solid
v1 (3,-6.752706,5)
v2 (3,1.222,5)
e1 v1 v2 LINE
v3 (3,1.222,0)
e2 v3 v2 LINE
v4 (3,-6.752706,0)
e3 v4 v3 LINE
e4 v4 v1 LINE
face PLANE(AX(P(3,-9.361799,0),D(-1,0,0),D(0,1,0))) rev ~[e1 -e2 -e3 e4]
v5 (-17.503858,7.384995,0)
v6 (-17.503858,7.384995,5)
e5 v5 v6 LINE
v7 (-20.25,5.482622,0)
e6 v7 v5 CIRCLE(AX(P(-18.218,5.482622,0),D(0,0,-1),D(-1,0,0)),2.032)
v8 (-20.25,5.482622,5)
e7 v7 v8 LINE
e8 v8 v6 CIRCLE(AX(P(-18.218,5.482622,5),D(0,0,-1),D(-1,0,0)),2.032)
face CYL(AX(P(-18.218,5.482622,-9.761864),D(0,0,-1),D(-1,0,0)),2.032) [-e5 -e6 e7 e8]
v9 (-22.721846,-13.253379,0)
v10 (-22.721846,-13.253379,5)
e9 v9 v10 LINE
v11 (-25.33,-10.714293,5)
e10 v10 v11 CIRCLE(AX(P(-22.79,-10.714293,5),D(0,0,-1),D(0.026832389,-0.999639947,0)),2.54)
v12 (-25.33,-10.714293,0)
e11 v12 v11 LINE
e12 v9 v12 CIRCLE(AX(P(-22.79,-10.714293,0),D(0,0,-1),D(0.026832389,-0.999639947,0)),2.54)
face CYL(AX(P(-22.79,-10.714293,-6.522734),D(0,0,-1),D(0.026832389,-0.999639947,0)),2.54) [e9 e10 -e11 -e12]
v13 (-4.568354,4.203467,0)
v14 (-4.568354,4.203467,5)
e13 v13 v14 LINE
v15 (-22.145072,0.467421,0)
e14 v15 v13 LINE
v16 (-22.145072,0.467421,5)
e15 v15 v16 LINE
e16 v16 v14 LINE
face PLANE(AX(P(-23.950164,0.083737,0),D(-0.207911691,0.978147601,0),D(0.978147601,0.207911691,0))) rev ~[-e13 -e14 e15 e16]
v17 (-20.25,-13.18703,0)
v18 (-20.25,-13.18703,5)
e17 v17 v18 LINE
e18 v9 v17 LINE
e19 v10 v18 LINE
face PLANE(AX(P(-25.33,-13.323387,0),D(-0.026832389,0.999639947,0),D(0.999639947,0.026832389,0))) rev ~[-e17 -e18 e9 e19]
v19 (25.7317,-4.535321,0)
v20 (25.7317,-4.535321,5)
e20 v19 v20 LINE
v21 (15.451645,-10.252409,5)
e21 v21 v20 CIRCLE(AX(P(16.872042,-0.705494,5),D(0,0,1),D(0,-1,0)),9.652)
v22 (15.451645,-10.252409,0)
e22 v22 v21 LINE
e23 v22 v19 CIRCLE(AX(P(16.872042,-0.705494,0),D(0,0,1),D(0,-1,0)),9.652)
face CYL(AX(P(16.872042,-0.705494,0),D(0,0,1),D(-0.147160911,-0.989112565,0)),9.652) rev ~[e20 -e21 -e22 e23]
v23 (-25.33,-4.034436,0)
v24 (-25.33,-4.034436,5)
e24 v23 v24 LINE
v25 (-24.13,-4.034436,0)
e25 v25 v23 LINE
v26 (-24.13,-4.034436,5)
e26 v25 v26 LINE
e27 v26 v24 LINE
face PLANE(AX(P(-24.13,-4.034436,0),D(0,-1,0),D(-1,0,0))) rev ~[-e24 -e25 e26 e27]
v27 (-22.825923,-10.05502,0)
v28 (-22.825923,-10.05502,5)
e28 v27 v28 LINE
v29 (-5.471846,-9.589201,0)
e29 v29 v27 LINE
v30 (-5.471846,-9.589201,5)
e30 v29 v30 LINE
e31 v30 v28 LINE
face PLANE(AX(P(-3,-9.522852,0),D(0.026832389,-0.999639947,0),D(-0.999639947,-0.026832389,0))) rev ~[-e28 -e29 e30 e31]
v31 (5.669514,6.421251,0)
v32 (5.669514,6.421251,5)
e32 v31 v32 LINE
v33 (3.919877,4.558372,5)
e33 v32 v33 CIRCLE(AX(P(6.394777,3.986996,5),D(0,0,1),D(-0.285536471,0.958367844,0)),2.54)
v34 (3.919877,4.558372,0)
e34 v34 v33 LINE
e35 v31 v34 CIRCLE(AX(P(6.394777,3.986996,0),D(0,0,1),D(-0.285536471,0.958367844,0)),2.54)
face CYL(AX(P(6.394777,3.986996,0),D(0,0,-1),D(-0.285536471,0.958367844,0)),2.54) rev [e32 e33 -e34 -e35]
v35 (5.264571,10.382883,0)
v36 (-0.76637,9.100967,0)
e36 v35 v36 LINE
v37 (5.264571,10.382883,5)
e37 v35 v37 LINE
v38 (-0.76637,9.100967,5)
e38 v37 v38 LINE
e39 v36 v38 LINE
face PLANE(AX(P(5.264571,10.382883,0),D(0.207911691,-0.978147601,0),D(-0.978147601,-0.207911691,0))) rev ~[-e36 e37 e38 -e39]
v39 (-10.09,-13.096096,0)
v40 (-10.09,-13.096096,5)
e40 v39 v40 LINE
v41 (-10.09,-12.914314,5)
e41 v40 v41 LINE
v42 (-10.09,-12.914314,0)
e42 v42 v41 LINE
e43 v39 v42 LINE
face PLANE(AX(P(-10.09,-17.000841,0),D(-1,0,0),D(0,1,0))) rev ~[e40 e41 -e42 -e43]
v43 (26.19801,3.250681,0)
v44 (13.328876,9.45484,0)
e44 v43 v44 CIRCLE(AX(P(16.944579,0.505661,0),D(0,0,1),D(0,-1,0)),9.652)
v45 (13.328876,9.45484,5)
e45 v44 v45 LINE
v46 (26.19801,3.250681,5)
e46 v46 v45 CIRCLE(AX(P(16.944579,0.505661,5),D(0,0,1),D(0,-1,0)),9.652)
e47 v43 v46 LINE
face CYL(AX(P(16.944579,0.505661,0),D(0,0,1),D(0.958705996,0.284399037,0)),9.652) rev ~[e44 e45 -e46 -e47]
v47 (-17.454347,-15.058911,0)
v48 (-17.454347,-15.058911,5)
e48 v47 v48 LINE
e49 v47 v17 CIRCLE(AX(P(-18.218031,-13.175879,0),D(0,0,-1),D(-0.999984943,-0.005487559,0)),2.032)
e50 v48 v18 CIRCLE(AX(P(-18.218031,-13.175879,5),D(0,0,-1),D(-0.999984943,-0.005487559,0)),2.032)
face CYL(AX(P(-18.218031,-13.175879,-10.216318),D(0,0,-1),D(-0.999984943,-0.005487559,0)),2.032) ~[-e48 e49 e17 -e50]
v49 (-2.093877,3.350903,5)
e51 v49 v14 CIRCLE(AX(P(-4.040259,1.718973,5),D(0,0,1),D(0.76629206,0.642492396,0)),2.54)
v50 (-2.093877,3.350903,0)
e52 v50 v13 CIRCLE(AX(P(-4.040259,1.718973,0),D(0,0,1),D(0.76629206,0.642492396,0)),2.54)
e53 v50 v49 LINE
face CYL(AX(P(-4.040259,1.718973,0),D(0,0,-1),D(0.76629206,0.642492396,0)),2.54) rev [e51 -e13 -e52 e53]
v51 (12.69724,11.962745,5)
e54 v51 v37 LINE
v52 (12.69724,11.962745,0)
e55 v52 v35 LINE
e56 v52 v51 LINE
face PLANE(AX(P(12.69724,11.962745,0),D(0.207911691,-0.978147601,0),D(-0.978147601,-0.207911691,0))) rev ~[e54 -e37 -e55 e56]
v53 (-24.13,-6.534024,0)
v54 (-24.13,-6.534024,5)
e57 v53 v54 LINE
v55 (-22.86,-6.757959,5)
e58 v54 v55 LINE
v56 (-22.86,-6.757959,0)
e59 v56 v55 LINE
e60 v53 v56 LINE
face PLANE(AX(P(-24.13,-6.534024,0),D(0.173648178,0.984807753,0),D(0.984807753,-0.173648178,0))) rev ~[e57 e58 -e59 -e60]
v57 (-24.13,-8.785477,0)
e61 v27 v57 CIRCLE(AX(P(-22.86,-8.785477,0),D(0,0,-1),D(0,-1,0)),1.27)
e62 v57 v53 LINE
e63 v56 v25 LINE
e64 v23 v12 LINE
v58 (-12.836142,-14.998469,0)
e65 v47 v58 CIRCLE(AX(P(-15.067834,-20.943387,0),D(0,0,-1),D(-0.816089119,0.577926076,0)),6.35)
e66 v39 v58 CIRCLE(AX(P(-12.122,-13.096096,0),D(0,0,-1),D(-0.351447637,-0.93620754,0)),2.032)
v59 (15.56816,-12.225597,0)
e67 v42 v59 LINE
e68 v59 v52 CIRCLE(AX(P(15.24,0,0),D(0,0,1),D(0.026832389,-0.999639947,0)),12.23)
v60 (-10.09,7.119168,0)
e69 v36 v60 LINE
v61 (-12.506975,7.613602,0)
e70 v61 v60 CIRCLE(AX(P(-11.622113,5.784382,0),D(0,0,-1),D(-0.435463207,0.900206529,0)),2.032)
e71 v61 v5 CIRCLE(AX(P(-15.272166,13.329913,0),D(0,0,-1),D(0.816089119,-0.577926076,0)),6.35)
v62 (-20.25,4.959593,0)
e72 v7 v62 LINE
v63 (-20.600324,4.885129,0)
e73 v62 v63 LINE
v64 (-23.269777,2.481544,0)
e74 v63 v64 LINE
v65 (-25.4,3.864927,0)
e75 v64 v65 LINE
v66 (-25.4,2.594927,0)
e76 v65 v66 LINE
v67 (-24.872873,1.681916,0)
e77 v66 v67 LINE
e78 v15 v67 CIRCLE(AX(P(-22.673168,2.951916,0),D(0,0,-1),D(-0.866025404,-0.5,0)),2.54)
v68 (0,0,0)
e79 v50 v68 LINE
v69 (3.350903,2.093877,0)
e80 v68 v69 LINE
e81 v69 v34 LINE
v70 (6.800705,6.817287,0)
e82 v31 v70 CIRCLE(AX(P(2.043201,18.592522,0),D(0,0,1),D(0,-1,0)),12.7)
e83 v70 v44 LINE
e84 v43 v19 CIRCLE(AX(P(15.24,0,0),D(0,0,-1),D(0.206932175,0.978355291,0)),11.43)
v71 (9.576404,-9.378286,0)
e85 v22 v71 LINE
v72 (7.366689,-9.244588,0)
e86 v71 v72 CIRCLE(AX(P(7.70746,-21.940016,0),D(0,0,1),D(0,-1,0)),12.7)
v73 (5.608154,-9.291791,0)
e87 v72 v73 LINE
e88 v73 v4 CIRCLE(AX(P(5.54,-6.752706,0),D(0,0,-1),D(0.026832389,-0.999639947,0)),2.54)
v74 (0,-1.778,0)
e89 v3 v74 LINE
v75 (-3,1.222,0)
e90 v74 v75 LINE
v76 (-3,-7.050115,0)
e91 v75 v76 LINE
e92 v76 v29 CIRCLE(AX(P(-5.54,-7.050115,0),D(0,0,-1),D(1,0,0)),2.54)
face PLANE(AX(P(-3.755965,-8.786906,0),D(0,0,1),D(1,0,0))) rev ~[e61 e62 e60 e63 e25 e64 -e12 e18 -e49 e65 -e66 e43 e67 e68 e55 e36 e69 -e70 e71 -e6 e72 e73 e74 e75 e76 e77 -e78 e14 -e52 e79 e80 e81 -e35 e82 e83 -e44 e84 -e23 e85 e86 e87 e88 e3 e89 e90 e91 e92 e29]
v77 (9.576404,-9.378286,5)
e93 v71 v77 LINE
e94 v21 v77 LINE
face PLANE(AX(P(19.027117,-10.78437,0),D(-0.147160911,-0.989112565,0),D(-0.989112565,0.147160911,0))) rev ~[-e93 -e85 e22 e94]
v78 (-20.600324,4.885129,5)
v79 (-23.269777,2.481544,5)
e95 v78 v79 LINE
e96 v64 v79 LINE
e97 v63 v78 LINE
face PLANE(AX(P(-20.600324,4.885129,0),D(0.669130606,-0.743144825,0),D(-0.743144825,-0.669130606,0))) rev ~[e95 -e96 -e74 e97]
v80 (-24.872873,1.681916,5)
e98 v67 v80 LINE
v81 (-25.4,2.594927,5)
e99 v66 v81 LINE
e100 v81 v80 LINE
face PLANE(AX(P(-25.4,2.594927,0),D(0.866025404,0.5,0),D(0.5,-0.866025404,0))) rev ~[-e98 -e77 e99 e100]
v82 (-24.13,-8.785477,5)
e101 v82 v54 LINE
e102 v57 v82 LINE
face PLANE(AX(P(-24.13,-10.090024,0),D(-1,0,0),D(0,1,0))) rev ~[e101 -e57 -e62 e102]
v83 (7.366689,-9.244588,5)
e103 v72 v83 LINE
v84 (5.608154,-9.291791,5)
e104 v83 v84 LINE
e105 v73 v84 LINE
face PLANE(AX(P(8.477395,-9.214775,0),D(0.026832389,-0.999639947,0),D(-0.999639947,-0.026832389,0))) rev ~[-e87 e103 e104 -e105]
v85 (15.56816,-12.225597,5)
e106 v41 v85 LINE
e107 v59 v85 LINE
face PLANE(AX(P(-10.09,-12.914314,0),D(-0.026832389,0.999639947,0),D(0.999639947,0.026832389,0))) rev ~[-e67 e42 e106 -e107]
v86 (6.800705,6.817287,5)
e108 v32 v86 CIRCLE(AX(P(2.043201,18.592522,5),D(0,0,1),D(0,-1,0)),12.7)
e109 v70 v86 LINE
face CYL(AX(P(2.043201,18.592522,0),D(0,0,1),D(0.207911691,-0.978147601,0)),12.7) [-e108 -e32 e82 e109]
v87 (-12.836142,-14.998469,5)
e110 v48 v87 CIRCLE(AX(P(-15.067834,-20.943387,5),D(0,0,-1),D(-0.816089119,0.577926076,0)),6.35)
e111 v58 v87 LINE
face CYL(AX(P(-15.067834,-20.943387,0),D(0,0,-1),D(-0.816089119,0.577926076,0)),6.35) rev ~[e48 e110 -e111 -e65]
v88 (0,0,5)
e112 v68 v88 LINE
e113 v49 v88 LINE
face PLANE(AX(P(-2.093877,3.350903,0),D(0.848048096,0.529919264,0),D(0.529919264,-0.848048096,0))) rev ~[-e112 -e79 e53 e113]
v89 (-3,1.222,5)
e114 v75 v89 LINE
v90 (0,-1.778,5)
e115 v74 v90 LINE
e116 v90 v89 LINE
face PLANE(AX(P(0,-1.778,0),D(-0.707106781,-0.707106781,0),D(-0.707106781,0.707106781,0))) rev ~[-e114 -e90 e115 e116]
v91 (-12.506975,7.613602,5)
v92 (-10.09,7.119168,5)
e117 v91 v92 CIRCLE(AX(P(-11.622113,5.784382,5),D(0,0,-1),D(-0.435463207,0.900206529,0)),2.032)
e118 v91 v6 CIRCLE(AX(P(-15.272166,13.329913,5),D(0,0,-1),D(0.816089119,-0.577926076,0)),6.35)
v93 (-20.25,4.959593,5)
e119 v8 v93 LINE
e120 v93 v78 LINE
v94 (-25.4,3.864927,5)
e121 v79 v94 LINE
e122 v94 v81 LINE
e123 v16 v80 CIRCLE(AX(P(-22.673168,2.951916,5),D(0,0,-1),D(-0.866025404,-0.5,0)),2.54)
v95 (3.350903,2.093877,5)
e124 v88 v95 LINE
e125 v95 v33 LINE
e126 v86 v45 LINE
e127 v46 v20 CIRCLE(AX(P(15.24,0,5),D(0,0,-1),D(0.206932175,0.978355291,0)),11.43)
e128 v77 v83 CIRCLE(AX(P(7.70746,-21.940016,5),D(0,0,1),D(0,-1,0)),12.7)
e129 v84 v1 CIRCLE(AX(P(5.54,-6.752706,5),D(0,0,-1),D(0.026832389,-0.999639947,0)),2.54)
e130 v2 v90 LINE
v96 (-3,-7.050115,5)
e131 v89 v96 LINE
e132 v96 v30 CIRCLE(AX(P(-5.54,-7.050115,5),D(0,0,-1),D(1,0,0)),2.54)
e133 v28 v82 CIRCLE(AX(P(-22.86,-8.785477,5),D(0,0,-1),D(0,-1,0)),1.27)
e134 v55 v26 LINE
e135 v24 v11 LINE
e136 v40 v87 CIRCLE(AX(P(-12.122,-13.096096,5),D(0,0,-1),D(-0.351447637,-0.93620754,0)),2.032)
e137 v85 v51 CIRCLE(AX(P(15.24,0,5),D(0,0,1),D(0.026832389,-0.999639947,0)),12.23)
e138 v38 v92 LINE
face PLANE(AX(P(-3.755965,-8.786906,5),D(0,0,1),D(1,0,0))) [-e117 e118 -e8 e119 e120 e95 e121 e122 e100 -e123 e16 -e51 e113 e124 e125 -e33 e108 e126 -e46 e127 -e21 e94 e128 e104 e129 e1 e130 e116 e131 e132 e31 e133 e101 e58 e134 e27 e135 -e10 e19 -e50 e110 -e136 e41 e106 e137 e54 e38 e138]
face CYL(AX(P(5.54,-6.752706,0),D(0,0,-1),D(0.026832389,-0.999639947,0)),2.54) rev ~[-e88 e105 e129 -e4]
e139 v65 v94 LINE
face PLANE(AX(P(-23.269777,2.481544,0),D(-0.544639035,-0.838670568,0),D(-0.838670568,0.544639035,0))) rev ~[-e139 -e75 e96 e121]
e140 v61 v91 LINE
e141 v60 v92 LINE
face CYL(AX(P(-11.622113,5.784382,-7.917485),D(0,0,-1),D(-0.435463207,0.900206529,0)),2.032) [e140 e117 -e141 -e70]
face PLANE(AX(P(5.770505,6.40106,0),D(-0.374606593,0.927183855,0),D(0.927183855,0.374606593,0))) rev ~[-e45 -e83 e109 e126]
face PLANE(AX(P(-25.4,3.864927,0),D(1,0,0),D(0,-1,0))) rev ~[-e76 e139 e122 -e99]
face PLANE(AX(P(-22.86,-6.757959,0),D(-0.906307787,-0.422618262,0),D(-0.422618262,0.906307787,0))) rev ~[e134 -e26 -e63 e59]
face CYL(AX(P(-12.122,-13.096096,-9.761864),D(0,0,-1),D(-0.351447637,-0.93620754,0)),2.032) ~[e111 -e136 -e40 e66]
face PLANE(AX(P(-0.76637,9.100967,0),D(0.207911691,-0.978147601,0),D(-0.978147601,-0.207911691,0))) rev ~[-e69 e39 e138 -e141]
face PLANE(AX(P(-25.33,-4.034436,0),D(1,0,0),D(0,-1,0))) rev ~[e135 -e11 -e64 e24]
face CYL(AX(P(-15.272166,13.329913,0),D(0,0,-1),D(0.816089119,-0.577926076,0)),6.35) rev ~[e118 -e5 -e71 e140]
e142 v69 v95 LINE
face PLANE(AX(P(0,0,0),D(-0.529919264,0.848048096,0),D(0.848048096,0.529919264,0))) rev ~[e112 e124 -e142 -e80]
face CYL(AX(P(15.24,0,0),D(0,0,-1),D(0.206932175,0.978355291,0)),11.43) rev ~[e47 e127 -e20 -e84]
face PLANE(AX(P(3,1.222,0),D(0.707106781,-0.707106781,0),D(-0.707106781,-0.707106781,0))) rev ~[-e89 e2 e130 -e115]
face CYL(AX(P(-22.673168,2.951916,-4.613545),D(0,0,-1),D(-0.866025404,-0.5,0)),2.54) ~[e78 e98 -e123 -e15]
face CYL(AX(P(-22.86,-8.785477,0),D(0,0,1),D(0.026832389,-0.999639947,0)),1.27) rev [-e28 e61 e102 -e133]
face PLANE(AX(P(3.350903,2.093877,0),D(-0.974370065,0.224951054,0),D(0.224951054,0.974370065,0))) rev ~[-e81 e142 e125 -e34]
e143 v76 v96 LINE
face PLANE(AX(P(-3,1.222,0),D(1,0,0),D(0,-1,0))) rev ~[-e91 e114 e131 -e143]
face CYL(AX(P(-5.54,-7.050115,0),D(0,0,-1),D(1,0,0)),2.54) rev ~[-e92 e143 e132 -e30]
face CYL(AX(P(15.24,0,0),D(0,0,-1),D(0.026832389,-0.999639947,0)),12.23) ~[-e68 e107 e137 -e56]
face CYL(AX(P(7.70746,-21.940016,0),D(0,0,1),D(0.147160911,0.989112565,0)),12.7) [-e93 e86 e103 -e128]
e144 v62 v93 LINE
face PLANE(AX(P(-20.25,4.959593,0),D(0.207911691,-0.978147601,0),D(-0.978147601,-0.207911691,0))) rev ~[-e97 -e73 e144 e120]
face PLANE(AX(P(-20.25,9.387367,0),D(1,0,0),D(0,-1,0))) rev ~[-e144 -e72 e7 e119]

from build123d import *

# Parameters (mm, degrees)
F1_DEPTH     = 5
F2_R         = 12.7
F3_T1_DEPTH  = 5
F3_T3_DEPTH  = 5
F3_T5_DEPTH  = 5
F3_T7_DEPTH  = 5
F3_T9_DEPTH  = 14.2270901057
F3_T11_DEPTH = 18.0454684025
F4_R         = 1.27
F5_R         = 9.652
F6_T1_DEPTH  = 24.5237287856
F6_T3_DEPTH  = 20.8349691576
F6_T5_DEPTH  = 25.4326352389


# Not quite as in the source:
# - a fillet or chamfer that OpenCascade refuses, or shapes differently, is made with other operations: its cross-section is extruded or revolved along the edge and cut away or added


with BuildPart() as f1:
    # F0 (on Top) → F1 (new body)
    with BuildSketch(Plane.XY):
        Polygon((3.3509032068, 2.0938767152), (4.2717468935, 6.0824889279), (5.2645709983, 10.3828825854), (-0.7663700033, 9.1009665025), (-1.7591941081, 4.800572845), (-2.0938767152, 3.3509032068), (0, 0), align=None)
        with BuildLine():
            ThreePointArc((19.0271173058, -10.7843702882), (13.5579507926, -11.3055566189), (8.4773948837, -9.2147746604))
            Line((8.4773948837, -9.2147746604), (3, -9.3617991862))
            Line((3, -9.3617991862), (-3, -9.5228515064))
            Line((-3, -9.5228515064), (-24.13, -10.0900240941))
            Line((-24.13, -10.0900240941), (-24.13, -6.5340240941))
            Line((-24.13, -6.5340240941), (-24.13, -4.0344355705))
            Line((-24.13, -4.0344355705), (-25.33, -4.0344355705))
            Line((-25.33, -4.0344355705), (-25.33, -13.3233871439))
            Line((-25.33, -13.3233871439), (-20.25, -13.1870295128))
            Line((-20.25, -13.1870295128), (-10.09, -12.9143142505))
            Line((-10.09, -12.9143142505), (15.568160115, -12.2255965474))
            ThreePointArc((15.568160115, -12.2255965474), (27.3847553183, 1.4414639293), (12.6972400213, 11.962745157))
            Line((12.6972400213, 11.962745157), (5.2645709983, 10.3828825854))
            Line((5.2645709983, 10.3828825854), (4.2717468935, 6.0824889279))
            Line((4.2717468935, 6.0824889279), (5.7705051289, 6.4010598252))
            ThreePointArc((5.7705051289, 6.4010598252), (10.9582466373, 10.5977114577), (17.6052347625, 11.1826009729))
            ThreePointArc((17.6052347625, 11.1826009729), (26.6461306142, 0.7382983213), (19.0271173058, -10.7843702882))
        make_face()
        Polygon((-24.13, -4.0344355705), (-24.13, -6.5340240941), (-22.86, -6.7579593596), align=None)
        Polygon((-3, -9.5228515064), (3, -9.3617991862), (3, 1.222), (0, -1.778), (-3, 1.222), align=None)
        Polygon((-1.7591941081, 4.800572845), (-0.7663700033, 9.1009665025), (-10.09, 7.1191677681), (-20.25, 4.9595931015), (-20.6003244103, 4.8851293494), (-23.2697767574, 2.48154366), (-25.4, 3.8649268089), (-25.4, 2.5949268089), (-23.9501636865, 0.0837366513), align=None)
        with BuildLine():
            Line((5.7705051289, 6.4010598252), (17.6052347625, 11.1826009729))
            ThreePointArc((17.6052347625, 11.1826009729), (10.9582466373, 10.5977114577), (5.7705051289, 6.4010598252))
        make_face()
        with BuildLine():
            Line((19.0271173058, -10.7843702882), (8.4773948837, -9.2147746604))
            ThreePointArc((8.4773948837, -9.2147746604), (13.5579507926, -11.3055566189), (19.0271173058, -10.7843702882))
        make_face()
        with BuildLine():
            Line((-20.25, 4.9595931015), (-10.09, 7.1191677681))
            Line((-10.09, 7.1191677681), (-10.09, 9.660082633))
            ThreePointArc((-10.09, 9.660082633), (-15.1017802383, 6.9821995552), (-20.25, 9.3873673708))
            Line((-20.25, 9.3873673708), (-20.25, 4.9595931015))
        make_face()
        with BuildLine():
            Line((-10.09, -17.0008412983), (-10.09, -12.9143142505))
            Line((-10.09, -12.9143142505), (-20.25, -13.1870295128))
            Line((-20.25, -13.1870295128), (-20.25, -17.2735565605))
            ThreePointArc((-20.25, -17.2735565605), (-15.2382197617, -14.5956734827), (-10.09, -17.0008412983))
        make_face()
    extrude(amount=F1_DEPTH)

    # F2
    f2_edges = [f1.edges().sort_by_distance(p)[0] for p in [
        (5.770505, 6.40106, 2.5),
        (8.477395, -9.214775, 2.5),
    ]]
    fillet(f2_edges, radius=F2_R)

    # F3: fillet of radius 2.54 on 8 edges, made by hand

    # F3_s2 → F3_t1 (join)
    with BuildSketch(Plane.XY):
        with BuildLine():
            ThreePointArc((5.6695141413, 6.421250807), (4.5433342643, 5.7258928643), (3.9198768127, 4.5583721621))
            Line((3.9198768127, 4.5583721621), (3.6723868163, 4.6155097299))
            Line((3.6723868163, 4.6155097299), (4.024256897, 6.1396264957))
            Line((4.024256897, 6.1396264957), (4.218937324, 6.3309384185))
            ThreePointArc((4.218937324, 6.3309384185), (4.6308698651, 6.4184973831), (5.5969878777, 6.6646762393))
            Line((5.5969878777, 6.6646762393), (5.6695141413, 6.421250807))
        make_face()
    extrude(amount=F3_T1_DEPTH)

    # F3_s4 → F3_t3 (join)
    with BuildSketch(Plane.XY):
        with BuildLine():
            ThreePointArc((-2.0938767152, 3.3509032068), (-3.2128527644, 4.1204303422), (-4.5683542412, 4.2034674259))
            Line((-4.5683542412, 4.2034674259), (-1.7591941081, 4.800572845))
            Line((-1.7591941081, 4.800572845), (-2.0938767152, 3.3509032068))
        make_face()
    extrude(amount=F3_T3_DEPTH)

    # F3_s6 → F3_t5 (join)
    with BuildSketch(Plane.XY):
        with BuildLine():
            ThreePointArc((5.6081542675, -9.2917909701), (3.7682087933, -8.5726933957), (3, -6.7527055057))
            Line((3, -6.7527055057), (3, -9.3617991862))
            Line((3, -9.3617991862), (5.6081542675, -9.2917909701))
        make_face()
    extrude(amount=F3_T5_DEPTH)

    # F3_s8 → F3_t7 (join)
    with BuildSketch(Plane.XY):
        with BuildLine():
            ThreePointArc((-3, -7.050115457), (-3.72001211, -8.8219066637), (-5.4718457325, -9.5892009215))
            Line((-5.4718457325, -9.5892009215), (-3, -9.5228515064))
            Line((-3, -9.5228515064), (-3, -7.050115457))
        make_face()
    extrude(amount=F3_T7_DEPTH)

    # F3_s10 → F3_t9 (cut)
    with BuildSketch(Plane.XY.offset(-4.6135450528)):
        with BuildLine():
            ThreePointArc((-24.872872697, 1.6819155382), (-23.7062792448, 0.6315100757), (-22.1450724768, 0.4674206323))
            Line((-22.1450724768, 0.4674206323), (-23.9501636865, 0.0837366513))
            Line((-23.9501636865, 0.0837366513), (-24.872872697, 1.6819155382))
        make_face()
    extrude(amount=F3_T9_DEPTH, mode=Mode.SUBTRACT)

    # F3_s12 → F3_t11 (cut)
    with BuildSketch(Plane.XY.offset(-6.5227342013)):
        with BuildLine():
            ThreePointArc((-22.7218457325, -13.2533789278), (-24.5617912067, -12.5342813534), (-25.33, -10.7142934634))
            Line((-25.33, -10.7142934634), (-25.33, -13.3233871439))
            Line((-25.33, -13.3233871439), (-22.7218457325, -13.2533789278))
        make_face()
    extrude(amount=F3_T11_DEPTH, mode=Mode.SUBTRACT)

    # F4
    f4_edges = [f1.edges().sort_by_distance(p)[0] for p in [
        (-24.13, -10.090024, 2.5),
    ]]
    fillet(f4_edges, radius=F4_R)

    # F5
    f5_edges = [f1.edges().sort_by_distance(p)[0] for p in [
        (17.605235, 11.182601, 2.5),
        (19.027117, -10.78437, 2.5),
    ]]
    fillet(f5_edges, radius=F5_R)

    # F6: fillet of radius 2.032 on 4 edges, made by hand

    # F6_s2 → F6_t1 (cut)
    with BuildSketch(Plane.XY.offset(-9.7618643928)):
        with BuildLine():
            ThreePointArc((-20.25, 5.4826216137), (-19.3751275367, 7.152974829), (-17.5038584017, 7.3849953356))
            ThreePointArc((-17.5038584017, 7.3849953356), (-19.0133811971, 8.1990450487), (-20.25, 9.3873673708))
            Line((-20.25, 9.3873673708), (-20.25, 5.4826216137))
        make_face()
        with BuildLine():
            ThreePointArc((-12.8361415983, -14.9984692631), (-10.9648724633, -14.7664487565), (-10.09, -13.0960955412))
            Line((-10.09, -13.0960955412), (-10.09, -17.0008412983))
            ThreePointArc((-10.09, -17.0008412983), (-11.3266188029, -15.8125189761), (-12.8361415983, -14.9984692631))
        make_face()
    extrude(amount=F6_T1_DEPTH, mode=Mode.SUBTRACT)

    # F6_s4 → F6_t3 (cut)
    with BuildSketch(Plane.XY.offset(-7.9174845788)):
        with BuildLine():
            ThreePointArc((-12.5069745437, 7.613601755), (-11.2148663887, 7.7751542861), (-10.09, 7.1191677681))
            Line((-10.09, 7.1191677681), (-10.09, 9.660082633))
            ThreePointArc((-10.09, 9.660082633), (-11.1688571334, 8.4837438934), (-12.5069745437, 7.613601755))
        make_face()
    extrude(amount=F6_T3_DEPTH, mode=Mode.SUBTRACT)

    # F6_s6 → F6_t5 (cut)
    with BuildSketch(Plane.XY.offset(-10.2163176194)):
        with BuildLine():
            ThreePointArc((-20.25, -13.1870295128), (-19.3485712422, -14.8643401762), (-17.4543465947, -15.0589111198))
            ThreePointArc((-17.4543465947, -15.0589111198), (-19.0108515696, -15.9659266289), (-20.25, -17.2735565605))
            Line((-20.25, -17.2735565605), (-20.25, -13.1870295128))
        make_face()
    extrude(amount=F6_T5_DEPTH, mode=Mode.SUBTRACT)


solid = f1.part
